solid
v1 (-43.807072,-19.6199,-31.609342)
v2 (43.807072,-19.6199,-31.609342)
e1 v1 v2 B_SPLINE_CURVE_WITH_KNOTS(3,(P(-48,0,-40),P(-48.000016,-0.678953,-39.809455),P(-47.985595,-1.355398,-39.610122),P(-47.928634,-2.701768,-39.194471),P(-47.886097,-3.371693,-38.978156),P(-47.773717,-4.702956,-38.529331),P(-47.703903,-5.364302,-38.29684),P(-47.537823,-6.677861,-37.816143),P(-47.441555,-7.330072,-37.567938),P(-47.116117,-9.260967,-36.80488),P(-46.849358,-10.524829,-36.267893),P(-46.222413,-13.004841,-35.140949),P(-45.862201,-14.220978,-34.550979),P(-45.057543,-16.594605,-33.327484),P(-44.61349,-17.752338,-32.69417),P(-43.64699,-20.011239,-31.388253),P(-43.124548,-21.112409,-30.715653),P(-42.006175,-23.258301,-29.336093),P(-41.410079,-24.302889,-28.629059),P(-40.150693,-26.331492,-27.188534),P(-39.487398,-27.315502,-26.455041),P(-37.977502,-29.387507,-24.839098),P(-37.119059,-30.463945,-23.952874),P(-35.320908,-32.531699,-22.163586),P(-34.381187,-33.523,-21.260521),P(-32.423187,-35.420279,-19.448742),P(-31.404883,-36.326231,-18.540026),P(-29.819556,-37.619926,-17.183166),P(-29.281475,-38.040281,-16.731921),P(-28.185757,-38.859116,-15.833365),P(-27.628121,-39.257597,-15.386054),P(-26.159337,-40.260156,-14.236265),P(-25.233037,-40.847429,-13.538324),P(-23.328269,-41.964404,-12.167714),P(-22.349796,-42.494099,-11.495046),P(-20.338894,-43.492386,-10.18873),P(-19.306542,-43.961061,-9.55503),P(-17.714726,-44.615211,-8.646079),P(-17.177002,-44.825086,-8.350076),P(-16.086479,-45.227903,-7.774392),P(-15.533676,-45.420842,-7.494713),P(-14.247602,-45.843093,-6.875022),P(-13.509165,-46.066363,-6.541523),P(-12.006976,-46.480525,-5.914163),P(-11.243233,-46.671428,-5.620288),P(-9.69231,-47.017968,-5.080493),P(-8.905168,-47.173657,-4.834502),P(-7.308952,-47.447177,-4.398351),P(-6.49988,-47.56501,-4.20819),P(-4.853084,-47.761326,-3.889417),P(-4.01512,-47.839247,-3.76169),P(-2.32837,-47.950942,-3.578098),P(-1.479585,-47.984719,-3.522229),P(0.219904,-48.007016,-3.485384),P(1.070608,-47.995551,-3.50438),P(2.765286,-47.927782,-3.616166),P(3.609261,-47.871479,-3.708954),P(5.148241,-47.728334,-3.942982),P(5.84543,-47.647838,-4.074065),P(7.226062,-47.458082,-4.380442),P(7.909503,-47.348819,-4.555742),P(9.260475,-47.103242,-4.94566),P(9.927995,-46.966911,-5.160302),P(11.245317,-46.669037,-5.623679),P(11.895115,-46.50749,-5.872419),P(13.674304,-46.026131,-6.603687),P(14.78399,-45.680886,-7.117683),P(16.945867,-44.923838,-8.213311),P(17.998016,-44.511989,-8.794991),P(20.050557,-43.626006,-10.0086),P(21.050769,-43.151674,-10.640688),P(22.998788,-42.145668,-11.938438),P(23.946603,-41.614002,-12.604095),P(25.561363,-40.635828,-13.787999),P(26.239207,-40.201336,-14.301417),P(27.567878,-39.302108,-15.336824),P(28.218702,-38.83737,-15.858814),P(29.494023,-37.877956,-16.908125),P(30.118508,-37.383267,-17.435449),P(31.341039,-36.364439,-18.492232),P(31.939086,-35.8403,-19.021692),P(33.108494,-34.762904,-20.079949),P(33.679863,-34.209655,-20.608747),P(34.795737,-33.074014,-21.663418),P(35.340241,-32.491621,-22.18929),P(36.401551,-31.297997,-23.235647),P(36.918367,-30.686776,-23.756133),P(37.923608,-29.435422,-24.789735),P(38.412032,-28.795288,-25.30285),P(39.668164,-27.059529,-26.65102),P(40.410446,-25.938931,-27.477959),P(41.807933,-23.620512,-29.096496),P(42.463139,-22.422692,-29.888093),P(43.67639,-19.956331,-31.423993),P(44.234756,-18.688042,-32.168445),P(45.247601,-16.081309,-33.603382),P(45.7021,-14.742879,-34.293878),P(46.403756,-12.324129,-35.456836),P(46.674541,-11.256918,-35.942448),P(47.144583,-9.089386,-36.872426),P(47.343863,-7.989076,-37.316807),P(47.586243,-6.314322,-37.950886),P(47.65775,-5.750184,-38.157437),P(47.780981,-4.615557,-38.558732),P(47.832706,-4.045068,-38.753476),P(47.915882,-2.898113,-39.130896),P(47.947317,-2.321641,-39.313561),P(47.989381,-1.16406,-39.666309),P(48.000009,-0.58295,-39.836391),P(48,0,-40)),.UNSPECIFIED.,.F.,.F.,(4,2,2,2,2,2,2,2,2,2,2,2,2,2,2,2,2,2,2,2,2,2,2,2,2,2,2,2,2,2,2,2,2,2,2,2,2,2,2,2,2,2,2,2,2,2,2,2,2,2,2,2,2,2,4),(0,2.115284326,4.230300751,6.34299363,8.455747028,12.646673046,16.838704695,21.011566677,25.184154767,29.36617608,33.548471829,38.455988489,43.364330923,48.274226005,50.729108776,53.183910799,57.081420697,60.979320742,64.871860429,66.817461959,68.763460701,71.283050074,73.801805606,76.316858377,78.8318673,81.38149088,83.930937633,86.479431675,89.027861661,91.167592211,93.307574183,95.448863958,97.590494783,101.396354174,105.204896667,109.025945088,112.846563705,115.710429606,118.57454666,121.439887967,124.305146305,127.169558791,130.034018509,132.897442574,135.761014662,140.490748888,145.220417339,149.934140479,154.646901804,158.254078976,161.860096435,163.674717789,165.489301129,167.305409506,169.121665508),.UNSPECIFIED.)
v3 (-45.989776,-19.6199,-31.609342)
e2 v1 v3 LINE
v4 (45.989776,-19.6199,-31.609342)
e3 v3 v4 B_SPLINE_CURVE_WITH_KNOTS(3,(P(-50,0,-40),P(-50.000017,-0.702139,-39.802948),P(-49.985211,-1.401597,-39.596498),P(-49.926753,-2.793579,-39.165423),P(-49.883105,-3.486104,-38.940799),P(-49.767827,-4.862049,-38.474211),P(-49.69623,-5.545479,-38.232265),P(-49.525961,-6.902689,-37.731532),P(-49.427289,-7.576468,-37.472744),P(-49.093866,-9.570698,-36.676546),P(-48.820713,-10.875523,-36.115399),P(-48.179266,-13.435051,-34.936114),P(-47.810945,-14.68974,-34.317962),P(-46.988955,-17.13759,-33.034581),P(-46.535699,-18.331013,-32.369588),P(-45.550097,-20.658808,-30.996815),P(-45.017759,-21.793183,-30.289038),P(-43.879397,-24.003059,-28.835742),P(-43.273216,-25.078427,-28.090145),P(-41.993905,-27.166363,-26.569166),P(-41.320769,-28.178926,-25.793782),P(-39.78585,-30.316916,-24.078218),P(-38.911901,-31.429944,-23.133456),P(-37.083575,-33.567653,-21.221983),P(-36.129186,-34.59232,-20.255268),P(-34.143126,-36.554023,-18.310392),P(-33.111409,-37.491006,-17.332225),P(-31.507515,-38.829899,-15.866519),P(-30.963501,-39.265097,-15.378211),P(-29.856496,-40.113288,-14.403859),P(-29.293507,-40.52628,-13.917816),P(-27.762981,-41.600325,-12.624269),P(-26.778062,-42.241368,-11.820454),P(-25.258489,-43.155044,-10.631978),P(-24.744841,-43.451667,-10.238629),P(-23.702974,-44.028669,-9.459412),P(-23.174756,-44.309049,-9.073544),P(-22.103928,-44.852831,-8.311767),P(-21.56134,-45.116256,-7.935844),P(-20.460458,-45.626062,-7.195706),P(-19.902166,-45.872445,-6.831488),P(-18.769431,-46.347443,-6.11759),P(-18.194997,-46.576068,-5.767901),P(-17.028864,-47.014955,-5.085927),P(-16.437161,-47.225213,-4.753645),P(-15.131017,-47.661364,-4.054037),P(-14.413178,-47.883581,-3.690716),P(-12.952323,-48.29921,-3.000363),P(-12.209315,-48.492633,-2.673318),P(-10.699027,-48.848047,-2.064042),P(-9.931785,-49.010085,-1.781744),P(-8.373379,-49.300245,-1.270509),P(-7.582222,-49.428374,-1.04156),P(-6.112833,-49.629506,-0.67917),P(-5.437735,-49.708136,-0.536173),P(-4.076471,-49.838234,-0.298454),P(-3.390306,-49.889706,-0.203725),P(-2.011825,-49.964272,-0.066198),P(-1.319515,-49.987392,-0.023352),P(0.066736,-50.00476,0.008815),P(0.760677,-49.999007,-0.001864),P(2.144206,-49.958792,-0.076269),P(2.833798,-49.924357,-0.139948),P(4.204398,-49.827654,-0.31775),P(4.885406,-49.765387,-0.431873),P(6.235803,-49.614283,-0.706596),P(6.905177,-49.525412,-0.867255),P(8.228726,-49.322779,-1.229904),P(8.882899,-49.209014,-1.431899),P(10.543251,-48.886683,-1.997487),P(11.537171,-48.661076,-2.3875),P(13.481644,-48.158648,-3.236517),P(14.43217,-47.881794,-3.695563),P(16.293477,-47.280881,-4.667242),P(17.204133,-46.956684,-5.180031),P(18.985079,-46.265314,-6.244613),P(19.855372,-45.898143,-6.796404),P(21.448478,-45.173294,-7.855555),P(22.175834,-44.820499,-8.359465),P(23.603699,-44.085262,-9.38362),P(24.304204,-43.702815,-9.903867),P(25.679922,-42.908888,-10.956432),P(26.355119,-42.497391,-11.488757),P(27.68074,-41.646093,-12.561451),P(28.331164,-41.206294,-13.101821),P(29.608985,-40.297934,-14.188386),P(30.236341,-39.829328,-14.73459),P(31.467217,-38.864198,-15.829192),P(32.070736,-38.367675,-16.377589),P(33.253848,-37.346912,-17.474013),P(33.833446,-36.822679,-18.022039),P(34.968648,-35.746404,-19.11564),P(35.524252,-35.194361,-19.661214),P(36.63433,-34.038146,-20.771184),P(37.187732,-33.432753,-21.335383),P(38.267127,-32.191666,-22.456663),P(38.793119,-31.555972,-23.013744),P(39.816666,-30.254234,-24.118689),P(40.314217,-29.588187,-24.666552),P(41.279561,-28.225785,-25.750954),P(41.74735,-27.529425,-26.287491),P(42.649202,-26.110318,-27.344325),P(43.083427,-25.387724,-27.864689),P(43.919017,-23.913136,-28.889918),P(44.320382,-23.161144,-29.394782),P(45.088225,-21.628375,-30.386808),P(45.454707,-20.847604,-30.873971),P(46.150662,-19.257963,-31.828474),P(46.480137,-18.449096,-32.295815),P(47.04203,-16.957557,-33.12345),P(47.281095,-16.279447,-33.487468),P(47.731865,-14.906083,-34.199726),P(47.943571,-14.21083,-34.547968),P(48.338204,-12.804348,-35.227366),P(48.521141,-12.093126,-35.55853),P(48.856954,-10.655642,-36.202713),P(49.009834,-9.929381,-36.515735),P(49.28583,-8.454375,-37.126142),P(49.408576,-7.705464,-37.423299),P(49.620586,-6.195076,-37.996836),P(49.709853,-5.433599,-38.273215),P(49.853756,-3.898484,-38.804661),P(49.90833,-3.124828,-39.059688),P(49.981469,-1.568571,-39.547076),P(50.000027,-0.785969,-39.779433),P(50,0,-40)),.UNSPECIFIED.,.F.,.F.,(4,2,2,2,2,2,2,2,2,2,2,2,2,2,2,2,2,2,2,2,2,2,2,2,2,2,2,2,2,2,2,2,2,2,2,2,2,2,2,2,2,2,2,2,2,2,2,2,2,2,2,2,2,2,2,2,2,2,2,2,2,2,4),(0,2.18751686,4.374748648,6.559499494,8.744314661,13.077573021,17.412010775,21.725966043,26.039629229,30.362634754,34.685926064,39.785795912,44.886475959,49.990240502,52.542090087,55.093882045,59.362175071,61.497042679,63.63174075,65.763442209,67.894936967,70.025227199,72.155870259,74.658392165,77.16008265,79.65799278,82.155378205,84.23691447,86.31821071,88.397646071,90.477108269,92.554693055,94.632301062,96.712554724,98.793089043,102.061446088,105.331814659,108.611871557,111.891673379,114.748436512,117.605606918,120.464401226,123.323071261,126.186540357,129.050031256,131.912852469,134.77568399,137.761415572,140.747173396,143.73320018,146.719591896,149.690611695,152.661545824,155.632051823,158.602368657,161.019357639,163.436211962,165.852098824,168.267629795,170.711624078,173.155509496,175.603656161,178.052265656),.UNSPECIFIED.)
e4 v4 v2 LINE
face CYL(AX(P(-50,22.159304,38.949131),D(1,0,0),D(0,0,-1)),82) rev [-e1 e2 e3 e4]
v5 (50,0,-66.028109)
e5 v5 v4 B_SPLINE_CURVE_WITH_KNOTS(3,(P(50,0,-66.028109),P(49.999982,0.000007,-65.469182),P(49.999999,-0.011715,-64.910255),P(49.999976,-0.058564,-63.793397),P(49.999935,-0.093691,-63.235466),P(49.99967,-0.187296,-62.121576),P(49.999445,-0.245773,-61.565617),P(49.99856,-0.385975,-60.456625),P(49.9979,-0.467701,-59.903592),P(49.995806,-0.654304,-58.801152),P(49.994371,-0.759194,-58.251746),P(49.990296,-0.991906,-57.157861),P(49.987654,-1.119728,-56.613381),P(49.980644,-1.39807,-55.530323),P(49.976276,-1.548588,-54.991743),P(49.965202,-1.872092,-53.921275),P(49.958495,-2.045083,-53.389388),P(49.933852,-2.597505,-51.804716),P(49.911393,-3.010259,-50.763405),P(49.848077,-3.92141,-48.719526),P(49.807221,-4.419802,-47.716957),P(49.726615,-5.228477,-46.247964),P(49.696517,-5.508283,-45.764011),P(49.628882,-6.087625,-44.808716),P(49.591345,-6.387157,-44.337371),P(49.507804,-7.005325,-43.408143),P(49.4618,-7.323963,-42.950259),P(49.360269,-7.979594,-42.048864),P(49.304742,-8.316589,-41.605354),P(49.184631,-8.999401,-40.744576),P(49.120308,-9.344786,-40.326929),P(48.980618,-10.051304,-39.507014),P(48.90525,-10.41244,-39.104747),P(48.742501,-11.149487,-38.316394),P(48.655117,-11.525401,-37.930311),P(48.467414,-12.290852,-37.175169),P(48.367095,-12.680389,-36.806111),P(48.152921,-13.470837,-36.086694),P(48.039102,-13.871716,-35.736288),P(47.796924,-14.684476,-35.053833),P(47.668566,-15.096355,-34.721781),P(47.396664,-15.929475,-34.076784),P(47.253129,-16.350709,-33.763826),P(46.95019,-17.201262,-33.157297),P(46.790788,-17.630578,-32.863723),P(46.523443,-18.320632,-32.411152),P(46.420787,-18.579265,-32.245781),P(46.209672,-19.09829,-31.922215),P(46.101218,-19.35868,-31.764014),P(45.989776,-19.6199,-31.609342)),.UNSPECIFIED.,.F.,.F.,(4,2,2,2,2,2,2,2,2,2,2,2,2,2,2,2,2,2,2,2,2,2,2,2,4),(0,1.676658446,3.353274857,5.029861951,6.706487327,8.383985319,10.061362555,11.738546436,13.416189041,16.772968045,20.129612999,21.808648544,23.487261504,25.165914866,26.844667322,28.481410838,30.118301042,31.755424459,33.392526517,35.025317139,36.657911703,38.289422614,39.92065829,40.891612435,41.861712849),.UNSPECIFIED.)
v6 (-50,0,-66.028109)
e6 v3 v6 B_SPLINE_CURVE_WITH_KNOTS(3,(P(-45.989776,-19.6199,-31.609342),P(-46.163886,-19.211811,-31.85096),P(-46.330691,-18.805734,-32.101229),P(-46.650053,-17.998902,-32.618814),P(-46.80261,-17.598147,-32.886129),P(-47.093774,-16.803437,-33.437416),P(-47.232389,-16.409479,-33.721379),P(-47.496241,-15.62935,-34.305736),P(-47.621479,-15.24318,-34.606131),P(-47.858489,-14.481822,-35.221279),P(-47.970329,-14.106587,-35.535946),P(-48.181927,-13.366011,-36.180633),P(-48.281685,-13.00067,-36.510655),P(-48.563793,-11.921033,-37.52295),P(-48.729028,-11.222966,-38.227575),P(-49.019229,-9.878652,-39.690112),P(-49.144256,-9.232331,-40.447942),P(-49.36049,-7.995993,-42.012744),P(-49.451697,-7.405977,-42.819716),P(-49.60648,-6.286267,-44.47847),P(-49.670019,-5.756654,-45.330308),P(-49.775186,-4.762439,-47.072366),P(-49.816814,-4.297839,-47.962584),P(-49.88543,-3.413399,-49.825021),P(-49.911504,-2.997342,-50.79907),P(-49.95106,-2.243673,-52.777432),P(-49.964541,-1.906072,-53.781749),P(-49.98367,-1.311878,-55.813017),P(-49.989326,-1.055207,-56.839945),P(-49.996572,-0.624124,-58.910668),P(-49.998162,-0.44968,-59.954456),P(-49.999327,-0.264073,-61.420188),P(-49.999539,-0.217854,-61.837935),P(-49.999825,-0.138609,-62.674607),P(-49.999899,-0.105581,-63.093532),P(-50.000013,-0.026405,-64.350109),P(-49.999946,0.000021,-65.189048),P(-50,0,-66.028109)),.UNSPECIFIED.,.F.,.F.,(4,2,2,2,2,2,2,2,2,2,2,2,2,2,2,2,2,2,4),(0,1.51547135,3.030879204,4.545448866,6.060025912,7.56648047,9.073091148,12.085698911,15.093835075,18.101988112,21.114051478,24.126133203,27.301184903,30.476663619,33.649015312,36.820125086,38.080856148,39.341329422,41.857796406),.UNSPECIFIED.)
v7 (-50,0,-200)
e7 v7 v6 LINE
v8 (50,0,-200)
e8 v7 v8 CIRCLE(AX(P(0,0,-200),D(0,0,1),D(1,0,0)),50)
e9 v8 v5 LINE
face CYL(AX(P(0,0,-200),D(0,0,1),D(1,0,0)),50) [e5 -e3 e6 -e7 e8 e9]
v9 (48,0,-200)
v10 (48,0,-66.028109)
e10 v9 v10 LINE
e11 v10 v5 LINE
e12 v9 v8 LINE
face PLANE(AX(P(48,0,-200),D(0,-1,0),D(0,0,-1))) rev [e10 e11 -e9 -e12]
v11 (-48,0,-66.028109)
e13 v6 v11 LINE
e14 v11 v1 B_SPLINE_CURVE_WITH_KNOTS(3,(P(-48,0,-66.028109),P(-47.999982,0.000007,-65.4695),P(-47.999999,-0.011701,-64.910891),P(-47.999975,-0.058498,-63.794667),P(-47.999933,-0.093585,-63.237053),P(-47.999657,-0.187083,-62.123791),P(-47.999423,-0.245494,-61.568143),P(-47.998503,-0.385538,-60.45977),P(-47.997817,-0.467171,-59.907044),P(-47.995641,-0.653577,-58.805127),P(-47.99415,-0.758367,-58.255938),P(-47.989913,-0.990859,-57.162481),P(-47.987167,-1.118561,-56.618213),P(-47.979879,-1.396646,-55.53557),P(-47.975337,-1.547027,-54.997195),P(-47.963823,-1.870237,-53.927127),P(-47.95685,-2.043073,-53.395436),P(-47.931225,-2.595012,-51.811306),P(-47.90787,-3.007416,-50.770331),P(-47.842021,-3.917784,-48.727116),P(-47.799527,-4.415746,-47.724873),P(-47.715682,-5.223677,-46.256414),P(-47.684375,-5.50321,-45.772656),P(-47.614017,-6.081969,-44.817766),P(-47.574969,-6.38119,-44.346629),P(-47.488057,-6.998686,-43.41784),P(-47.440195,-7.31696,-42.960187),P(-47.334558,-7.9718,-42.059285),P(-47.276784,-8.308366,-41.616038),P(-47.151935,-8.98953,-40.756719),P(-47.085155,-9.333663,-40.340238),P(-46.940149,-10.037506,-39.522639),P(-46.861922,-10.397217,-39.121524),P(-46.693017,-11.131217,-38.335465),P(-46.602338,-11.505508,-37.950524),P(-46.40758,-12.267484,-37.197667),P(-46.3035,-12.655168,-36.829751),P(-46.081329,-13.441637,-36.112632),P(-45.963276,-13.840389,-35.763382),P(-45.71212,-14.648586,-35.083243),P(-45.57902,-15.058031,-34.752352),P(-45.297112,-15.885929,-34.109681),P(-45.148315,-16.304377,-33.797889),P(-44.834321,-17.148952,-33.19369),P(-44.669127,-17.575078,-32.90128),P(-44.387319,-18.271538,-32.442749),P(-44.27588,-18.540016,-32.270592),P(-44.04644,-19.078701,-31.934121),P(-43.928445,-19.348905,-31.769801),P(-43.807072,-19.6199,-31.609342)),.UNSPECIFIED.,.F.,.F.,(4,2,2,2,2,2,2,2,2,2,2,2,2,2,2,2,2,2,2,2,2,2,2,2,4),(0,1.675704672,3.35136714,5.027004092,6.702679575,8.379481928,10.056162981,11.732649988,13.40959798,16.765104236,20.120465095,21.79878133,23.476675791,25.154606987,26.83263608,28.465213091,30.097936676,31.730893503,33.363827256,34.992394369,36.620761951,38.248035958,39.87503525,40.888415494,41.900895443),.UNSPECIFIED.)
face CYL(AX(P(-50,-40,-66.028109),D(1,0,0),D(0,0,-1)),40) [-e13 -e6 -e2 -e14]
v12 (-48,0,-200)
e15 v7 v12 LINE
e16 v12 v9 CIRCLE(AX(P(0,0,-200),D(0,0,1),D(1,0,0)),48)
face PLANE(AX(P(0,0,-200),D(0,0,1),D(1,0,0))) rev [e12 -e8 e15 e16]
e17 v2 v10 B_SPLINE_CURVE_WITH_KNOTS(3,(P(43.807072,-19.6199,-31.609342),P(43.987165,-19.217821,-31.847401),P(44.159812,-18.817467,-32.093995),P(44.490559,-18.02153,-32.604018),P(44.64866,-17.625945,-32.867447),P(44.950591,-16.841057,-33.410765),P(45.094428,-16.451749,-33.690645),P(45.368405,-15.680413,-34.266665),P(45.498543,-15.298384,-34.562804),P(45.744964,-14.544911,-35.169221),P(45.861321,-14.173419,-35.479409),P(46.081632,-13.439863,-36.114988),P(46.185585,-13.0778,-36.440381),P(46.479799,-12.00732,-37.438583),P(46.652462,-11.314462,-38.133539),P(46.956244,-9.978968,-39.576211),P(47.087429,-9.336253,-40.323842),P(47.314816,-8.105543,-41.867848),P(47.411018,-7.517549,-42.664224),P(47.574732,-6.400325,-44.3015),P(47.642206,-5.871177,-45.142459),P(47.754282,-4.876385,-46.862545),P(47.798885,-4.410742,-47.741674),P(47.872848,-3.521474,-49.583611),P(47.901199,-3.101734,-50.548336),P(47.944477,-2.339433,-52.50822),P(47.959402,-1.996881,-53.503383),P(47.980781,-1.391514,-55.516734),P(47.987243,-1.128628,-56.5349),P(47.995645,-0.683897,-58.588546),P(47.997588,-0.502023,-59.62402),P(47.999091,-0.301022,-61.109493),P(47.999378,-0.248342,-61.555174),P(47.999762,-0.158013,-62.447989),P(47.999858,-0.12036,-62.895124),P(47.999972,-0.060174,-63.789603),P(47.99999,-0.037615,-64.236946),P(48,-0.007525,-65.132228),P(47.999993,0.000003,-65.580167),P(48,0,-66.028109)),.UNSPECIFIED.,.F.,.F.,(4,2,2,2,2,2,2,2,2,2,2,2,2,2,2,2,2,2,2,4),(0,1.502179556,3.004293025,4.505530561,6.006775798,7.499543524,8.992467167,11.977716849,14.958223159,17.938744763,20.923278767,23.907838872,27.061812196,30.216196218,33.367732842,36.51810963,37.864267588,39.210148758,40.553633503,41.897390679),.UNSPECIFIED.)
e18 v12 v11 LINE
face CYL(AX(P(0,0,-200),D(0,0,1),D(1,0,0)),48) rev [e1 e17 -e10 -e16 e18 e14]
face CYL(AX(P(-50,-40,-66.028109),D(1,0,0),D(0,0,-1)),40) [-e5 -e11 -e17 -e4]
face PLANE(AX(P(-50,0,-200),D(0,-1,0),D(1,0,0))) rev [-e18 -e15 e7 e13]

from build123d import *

# Parameters (mm, degrees)
EXTRUDE_THIN1_DEPTH     = 200
CUT_EXTRUDE1_DEPTH      = 213.132034356
CUT_EXTRUDE1_DEPTH_BACK = 213.132034356
FILLET1_R               = 40


with BuildPart() as part:
    # Sketch1 → Extrude-Thin1 (new body)
    with BuildSketch(Plane.XY):
        with BuildLine():
            ThreePointArc((-50, 0), (0, -50), (50, 0))
            Line((50, 0), (48, 0))
            ThreePointArc((48, 0), (0, -48), (-48, 0))
            Line((-48, 0), (-50, 0))
        make_face()
    extrude(amount=-EXTRUDE_THIN1_DEPTH)

    # Sketch2 → Cut-Extrude1 (cut, two sides: drawn at the far end of the back side and taken through both)
    with BuildSketch(Plane(origin=(0, 0, 0), x_dir=(0, 0, -1), z_dir=(1, 0, 0)).offset(-CUT_EXTRUDE1_DEPTH_BACK)):
        with BuildLine():
            Line((0, 0), (0, -50))
            ThreePointArc((0, -50), (25.082111762, -29.065689409), (40, 0))
            Line((40, 0), (0, 0))
        make_face()
    extrude(amount=CUT_EXTRUDE1_DEPTH + CUT_EXTRUDE1_DEPTH_BACK, mode=Mode.SUBTRACT)

    # Fillet1
    # the kernel refuses this fillet: 40 mm, written as the material it takes off along each edge
    with BuildSketch(Plane(origin=(115.07027284, 0, -40), x_dir=(0, 0, -1), z_dir=(-1, 0, 0)), Plane(origin=(17.07027284, 0, -40), x_dir=(0, 0, -1), z_dir=(-1, 0, 0))) as fillet1_piece_1:
        with BuildLine():
            CenterArc((26.028109136, 40), FILLET1_R, 210.63069692, 59.36930308)
            ThreePointArc((-8.390657995, 19.619900167), (-3.554396204, 10.084051777), (0, 0))
            Line((0, 0), (26.028109136, 0))
        make_face()
    extrude(amount=132.140545681, mode=Mode.SUBTRACT)


solid = part.part
